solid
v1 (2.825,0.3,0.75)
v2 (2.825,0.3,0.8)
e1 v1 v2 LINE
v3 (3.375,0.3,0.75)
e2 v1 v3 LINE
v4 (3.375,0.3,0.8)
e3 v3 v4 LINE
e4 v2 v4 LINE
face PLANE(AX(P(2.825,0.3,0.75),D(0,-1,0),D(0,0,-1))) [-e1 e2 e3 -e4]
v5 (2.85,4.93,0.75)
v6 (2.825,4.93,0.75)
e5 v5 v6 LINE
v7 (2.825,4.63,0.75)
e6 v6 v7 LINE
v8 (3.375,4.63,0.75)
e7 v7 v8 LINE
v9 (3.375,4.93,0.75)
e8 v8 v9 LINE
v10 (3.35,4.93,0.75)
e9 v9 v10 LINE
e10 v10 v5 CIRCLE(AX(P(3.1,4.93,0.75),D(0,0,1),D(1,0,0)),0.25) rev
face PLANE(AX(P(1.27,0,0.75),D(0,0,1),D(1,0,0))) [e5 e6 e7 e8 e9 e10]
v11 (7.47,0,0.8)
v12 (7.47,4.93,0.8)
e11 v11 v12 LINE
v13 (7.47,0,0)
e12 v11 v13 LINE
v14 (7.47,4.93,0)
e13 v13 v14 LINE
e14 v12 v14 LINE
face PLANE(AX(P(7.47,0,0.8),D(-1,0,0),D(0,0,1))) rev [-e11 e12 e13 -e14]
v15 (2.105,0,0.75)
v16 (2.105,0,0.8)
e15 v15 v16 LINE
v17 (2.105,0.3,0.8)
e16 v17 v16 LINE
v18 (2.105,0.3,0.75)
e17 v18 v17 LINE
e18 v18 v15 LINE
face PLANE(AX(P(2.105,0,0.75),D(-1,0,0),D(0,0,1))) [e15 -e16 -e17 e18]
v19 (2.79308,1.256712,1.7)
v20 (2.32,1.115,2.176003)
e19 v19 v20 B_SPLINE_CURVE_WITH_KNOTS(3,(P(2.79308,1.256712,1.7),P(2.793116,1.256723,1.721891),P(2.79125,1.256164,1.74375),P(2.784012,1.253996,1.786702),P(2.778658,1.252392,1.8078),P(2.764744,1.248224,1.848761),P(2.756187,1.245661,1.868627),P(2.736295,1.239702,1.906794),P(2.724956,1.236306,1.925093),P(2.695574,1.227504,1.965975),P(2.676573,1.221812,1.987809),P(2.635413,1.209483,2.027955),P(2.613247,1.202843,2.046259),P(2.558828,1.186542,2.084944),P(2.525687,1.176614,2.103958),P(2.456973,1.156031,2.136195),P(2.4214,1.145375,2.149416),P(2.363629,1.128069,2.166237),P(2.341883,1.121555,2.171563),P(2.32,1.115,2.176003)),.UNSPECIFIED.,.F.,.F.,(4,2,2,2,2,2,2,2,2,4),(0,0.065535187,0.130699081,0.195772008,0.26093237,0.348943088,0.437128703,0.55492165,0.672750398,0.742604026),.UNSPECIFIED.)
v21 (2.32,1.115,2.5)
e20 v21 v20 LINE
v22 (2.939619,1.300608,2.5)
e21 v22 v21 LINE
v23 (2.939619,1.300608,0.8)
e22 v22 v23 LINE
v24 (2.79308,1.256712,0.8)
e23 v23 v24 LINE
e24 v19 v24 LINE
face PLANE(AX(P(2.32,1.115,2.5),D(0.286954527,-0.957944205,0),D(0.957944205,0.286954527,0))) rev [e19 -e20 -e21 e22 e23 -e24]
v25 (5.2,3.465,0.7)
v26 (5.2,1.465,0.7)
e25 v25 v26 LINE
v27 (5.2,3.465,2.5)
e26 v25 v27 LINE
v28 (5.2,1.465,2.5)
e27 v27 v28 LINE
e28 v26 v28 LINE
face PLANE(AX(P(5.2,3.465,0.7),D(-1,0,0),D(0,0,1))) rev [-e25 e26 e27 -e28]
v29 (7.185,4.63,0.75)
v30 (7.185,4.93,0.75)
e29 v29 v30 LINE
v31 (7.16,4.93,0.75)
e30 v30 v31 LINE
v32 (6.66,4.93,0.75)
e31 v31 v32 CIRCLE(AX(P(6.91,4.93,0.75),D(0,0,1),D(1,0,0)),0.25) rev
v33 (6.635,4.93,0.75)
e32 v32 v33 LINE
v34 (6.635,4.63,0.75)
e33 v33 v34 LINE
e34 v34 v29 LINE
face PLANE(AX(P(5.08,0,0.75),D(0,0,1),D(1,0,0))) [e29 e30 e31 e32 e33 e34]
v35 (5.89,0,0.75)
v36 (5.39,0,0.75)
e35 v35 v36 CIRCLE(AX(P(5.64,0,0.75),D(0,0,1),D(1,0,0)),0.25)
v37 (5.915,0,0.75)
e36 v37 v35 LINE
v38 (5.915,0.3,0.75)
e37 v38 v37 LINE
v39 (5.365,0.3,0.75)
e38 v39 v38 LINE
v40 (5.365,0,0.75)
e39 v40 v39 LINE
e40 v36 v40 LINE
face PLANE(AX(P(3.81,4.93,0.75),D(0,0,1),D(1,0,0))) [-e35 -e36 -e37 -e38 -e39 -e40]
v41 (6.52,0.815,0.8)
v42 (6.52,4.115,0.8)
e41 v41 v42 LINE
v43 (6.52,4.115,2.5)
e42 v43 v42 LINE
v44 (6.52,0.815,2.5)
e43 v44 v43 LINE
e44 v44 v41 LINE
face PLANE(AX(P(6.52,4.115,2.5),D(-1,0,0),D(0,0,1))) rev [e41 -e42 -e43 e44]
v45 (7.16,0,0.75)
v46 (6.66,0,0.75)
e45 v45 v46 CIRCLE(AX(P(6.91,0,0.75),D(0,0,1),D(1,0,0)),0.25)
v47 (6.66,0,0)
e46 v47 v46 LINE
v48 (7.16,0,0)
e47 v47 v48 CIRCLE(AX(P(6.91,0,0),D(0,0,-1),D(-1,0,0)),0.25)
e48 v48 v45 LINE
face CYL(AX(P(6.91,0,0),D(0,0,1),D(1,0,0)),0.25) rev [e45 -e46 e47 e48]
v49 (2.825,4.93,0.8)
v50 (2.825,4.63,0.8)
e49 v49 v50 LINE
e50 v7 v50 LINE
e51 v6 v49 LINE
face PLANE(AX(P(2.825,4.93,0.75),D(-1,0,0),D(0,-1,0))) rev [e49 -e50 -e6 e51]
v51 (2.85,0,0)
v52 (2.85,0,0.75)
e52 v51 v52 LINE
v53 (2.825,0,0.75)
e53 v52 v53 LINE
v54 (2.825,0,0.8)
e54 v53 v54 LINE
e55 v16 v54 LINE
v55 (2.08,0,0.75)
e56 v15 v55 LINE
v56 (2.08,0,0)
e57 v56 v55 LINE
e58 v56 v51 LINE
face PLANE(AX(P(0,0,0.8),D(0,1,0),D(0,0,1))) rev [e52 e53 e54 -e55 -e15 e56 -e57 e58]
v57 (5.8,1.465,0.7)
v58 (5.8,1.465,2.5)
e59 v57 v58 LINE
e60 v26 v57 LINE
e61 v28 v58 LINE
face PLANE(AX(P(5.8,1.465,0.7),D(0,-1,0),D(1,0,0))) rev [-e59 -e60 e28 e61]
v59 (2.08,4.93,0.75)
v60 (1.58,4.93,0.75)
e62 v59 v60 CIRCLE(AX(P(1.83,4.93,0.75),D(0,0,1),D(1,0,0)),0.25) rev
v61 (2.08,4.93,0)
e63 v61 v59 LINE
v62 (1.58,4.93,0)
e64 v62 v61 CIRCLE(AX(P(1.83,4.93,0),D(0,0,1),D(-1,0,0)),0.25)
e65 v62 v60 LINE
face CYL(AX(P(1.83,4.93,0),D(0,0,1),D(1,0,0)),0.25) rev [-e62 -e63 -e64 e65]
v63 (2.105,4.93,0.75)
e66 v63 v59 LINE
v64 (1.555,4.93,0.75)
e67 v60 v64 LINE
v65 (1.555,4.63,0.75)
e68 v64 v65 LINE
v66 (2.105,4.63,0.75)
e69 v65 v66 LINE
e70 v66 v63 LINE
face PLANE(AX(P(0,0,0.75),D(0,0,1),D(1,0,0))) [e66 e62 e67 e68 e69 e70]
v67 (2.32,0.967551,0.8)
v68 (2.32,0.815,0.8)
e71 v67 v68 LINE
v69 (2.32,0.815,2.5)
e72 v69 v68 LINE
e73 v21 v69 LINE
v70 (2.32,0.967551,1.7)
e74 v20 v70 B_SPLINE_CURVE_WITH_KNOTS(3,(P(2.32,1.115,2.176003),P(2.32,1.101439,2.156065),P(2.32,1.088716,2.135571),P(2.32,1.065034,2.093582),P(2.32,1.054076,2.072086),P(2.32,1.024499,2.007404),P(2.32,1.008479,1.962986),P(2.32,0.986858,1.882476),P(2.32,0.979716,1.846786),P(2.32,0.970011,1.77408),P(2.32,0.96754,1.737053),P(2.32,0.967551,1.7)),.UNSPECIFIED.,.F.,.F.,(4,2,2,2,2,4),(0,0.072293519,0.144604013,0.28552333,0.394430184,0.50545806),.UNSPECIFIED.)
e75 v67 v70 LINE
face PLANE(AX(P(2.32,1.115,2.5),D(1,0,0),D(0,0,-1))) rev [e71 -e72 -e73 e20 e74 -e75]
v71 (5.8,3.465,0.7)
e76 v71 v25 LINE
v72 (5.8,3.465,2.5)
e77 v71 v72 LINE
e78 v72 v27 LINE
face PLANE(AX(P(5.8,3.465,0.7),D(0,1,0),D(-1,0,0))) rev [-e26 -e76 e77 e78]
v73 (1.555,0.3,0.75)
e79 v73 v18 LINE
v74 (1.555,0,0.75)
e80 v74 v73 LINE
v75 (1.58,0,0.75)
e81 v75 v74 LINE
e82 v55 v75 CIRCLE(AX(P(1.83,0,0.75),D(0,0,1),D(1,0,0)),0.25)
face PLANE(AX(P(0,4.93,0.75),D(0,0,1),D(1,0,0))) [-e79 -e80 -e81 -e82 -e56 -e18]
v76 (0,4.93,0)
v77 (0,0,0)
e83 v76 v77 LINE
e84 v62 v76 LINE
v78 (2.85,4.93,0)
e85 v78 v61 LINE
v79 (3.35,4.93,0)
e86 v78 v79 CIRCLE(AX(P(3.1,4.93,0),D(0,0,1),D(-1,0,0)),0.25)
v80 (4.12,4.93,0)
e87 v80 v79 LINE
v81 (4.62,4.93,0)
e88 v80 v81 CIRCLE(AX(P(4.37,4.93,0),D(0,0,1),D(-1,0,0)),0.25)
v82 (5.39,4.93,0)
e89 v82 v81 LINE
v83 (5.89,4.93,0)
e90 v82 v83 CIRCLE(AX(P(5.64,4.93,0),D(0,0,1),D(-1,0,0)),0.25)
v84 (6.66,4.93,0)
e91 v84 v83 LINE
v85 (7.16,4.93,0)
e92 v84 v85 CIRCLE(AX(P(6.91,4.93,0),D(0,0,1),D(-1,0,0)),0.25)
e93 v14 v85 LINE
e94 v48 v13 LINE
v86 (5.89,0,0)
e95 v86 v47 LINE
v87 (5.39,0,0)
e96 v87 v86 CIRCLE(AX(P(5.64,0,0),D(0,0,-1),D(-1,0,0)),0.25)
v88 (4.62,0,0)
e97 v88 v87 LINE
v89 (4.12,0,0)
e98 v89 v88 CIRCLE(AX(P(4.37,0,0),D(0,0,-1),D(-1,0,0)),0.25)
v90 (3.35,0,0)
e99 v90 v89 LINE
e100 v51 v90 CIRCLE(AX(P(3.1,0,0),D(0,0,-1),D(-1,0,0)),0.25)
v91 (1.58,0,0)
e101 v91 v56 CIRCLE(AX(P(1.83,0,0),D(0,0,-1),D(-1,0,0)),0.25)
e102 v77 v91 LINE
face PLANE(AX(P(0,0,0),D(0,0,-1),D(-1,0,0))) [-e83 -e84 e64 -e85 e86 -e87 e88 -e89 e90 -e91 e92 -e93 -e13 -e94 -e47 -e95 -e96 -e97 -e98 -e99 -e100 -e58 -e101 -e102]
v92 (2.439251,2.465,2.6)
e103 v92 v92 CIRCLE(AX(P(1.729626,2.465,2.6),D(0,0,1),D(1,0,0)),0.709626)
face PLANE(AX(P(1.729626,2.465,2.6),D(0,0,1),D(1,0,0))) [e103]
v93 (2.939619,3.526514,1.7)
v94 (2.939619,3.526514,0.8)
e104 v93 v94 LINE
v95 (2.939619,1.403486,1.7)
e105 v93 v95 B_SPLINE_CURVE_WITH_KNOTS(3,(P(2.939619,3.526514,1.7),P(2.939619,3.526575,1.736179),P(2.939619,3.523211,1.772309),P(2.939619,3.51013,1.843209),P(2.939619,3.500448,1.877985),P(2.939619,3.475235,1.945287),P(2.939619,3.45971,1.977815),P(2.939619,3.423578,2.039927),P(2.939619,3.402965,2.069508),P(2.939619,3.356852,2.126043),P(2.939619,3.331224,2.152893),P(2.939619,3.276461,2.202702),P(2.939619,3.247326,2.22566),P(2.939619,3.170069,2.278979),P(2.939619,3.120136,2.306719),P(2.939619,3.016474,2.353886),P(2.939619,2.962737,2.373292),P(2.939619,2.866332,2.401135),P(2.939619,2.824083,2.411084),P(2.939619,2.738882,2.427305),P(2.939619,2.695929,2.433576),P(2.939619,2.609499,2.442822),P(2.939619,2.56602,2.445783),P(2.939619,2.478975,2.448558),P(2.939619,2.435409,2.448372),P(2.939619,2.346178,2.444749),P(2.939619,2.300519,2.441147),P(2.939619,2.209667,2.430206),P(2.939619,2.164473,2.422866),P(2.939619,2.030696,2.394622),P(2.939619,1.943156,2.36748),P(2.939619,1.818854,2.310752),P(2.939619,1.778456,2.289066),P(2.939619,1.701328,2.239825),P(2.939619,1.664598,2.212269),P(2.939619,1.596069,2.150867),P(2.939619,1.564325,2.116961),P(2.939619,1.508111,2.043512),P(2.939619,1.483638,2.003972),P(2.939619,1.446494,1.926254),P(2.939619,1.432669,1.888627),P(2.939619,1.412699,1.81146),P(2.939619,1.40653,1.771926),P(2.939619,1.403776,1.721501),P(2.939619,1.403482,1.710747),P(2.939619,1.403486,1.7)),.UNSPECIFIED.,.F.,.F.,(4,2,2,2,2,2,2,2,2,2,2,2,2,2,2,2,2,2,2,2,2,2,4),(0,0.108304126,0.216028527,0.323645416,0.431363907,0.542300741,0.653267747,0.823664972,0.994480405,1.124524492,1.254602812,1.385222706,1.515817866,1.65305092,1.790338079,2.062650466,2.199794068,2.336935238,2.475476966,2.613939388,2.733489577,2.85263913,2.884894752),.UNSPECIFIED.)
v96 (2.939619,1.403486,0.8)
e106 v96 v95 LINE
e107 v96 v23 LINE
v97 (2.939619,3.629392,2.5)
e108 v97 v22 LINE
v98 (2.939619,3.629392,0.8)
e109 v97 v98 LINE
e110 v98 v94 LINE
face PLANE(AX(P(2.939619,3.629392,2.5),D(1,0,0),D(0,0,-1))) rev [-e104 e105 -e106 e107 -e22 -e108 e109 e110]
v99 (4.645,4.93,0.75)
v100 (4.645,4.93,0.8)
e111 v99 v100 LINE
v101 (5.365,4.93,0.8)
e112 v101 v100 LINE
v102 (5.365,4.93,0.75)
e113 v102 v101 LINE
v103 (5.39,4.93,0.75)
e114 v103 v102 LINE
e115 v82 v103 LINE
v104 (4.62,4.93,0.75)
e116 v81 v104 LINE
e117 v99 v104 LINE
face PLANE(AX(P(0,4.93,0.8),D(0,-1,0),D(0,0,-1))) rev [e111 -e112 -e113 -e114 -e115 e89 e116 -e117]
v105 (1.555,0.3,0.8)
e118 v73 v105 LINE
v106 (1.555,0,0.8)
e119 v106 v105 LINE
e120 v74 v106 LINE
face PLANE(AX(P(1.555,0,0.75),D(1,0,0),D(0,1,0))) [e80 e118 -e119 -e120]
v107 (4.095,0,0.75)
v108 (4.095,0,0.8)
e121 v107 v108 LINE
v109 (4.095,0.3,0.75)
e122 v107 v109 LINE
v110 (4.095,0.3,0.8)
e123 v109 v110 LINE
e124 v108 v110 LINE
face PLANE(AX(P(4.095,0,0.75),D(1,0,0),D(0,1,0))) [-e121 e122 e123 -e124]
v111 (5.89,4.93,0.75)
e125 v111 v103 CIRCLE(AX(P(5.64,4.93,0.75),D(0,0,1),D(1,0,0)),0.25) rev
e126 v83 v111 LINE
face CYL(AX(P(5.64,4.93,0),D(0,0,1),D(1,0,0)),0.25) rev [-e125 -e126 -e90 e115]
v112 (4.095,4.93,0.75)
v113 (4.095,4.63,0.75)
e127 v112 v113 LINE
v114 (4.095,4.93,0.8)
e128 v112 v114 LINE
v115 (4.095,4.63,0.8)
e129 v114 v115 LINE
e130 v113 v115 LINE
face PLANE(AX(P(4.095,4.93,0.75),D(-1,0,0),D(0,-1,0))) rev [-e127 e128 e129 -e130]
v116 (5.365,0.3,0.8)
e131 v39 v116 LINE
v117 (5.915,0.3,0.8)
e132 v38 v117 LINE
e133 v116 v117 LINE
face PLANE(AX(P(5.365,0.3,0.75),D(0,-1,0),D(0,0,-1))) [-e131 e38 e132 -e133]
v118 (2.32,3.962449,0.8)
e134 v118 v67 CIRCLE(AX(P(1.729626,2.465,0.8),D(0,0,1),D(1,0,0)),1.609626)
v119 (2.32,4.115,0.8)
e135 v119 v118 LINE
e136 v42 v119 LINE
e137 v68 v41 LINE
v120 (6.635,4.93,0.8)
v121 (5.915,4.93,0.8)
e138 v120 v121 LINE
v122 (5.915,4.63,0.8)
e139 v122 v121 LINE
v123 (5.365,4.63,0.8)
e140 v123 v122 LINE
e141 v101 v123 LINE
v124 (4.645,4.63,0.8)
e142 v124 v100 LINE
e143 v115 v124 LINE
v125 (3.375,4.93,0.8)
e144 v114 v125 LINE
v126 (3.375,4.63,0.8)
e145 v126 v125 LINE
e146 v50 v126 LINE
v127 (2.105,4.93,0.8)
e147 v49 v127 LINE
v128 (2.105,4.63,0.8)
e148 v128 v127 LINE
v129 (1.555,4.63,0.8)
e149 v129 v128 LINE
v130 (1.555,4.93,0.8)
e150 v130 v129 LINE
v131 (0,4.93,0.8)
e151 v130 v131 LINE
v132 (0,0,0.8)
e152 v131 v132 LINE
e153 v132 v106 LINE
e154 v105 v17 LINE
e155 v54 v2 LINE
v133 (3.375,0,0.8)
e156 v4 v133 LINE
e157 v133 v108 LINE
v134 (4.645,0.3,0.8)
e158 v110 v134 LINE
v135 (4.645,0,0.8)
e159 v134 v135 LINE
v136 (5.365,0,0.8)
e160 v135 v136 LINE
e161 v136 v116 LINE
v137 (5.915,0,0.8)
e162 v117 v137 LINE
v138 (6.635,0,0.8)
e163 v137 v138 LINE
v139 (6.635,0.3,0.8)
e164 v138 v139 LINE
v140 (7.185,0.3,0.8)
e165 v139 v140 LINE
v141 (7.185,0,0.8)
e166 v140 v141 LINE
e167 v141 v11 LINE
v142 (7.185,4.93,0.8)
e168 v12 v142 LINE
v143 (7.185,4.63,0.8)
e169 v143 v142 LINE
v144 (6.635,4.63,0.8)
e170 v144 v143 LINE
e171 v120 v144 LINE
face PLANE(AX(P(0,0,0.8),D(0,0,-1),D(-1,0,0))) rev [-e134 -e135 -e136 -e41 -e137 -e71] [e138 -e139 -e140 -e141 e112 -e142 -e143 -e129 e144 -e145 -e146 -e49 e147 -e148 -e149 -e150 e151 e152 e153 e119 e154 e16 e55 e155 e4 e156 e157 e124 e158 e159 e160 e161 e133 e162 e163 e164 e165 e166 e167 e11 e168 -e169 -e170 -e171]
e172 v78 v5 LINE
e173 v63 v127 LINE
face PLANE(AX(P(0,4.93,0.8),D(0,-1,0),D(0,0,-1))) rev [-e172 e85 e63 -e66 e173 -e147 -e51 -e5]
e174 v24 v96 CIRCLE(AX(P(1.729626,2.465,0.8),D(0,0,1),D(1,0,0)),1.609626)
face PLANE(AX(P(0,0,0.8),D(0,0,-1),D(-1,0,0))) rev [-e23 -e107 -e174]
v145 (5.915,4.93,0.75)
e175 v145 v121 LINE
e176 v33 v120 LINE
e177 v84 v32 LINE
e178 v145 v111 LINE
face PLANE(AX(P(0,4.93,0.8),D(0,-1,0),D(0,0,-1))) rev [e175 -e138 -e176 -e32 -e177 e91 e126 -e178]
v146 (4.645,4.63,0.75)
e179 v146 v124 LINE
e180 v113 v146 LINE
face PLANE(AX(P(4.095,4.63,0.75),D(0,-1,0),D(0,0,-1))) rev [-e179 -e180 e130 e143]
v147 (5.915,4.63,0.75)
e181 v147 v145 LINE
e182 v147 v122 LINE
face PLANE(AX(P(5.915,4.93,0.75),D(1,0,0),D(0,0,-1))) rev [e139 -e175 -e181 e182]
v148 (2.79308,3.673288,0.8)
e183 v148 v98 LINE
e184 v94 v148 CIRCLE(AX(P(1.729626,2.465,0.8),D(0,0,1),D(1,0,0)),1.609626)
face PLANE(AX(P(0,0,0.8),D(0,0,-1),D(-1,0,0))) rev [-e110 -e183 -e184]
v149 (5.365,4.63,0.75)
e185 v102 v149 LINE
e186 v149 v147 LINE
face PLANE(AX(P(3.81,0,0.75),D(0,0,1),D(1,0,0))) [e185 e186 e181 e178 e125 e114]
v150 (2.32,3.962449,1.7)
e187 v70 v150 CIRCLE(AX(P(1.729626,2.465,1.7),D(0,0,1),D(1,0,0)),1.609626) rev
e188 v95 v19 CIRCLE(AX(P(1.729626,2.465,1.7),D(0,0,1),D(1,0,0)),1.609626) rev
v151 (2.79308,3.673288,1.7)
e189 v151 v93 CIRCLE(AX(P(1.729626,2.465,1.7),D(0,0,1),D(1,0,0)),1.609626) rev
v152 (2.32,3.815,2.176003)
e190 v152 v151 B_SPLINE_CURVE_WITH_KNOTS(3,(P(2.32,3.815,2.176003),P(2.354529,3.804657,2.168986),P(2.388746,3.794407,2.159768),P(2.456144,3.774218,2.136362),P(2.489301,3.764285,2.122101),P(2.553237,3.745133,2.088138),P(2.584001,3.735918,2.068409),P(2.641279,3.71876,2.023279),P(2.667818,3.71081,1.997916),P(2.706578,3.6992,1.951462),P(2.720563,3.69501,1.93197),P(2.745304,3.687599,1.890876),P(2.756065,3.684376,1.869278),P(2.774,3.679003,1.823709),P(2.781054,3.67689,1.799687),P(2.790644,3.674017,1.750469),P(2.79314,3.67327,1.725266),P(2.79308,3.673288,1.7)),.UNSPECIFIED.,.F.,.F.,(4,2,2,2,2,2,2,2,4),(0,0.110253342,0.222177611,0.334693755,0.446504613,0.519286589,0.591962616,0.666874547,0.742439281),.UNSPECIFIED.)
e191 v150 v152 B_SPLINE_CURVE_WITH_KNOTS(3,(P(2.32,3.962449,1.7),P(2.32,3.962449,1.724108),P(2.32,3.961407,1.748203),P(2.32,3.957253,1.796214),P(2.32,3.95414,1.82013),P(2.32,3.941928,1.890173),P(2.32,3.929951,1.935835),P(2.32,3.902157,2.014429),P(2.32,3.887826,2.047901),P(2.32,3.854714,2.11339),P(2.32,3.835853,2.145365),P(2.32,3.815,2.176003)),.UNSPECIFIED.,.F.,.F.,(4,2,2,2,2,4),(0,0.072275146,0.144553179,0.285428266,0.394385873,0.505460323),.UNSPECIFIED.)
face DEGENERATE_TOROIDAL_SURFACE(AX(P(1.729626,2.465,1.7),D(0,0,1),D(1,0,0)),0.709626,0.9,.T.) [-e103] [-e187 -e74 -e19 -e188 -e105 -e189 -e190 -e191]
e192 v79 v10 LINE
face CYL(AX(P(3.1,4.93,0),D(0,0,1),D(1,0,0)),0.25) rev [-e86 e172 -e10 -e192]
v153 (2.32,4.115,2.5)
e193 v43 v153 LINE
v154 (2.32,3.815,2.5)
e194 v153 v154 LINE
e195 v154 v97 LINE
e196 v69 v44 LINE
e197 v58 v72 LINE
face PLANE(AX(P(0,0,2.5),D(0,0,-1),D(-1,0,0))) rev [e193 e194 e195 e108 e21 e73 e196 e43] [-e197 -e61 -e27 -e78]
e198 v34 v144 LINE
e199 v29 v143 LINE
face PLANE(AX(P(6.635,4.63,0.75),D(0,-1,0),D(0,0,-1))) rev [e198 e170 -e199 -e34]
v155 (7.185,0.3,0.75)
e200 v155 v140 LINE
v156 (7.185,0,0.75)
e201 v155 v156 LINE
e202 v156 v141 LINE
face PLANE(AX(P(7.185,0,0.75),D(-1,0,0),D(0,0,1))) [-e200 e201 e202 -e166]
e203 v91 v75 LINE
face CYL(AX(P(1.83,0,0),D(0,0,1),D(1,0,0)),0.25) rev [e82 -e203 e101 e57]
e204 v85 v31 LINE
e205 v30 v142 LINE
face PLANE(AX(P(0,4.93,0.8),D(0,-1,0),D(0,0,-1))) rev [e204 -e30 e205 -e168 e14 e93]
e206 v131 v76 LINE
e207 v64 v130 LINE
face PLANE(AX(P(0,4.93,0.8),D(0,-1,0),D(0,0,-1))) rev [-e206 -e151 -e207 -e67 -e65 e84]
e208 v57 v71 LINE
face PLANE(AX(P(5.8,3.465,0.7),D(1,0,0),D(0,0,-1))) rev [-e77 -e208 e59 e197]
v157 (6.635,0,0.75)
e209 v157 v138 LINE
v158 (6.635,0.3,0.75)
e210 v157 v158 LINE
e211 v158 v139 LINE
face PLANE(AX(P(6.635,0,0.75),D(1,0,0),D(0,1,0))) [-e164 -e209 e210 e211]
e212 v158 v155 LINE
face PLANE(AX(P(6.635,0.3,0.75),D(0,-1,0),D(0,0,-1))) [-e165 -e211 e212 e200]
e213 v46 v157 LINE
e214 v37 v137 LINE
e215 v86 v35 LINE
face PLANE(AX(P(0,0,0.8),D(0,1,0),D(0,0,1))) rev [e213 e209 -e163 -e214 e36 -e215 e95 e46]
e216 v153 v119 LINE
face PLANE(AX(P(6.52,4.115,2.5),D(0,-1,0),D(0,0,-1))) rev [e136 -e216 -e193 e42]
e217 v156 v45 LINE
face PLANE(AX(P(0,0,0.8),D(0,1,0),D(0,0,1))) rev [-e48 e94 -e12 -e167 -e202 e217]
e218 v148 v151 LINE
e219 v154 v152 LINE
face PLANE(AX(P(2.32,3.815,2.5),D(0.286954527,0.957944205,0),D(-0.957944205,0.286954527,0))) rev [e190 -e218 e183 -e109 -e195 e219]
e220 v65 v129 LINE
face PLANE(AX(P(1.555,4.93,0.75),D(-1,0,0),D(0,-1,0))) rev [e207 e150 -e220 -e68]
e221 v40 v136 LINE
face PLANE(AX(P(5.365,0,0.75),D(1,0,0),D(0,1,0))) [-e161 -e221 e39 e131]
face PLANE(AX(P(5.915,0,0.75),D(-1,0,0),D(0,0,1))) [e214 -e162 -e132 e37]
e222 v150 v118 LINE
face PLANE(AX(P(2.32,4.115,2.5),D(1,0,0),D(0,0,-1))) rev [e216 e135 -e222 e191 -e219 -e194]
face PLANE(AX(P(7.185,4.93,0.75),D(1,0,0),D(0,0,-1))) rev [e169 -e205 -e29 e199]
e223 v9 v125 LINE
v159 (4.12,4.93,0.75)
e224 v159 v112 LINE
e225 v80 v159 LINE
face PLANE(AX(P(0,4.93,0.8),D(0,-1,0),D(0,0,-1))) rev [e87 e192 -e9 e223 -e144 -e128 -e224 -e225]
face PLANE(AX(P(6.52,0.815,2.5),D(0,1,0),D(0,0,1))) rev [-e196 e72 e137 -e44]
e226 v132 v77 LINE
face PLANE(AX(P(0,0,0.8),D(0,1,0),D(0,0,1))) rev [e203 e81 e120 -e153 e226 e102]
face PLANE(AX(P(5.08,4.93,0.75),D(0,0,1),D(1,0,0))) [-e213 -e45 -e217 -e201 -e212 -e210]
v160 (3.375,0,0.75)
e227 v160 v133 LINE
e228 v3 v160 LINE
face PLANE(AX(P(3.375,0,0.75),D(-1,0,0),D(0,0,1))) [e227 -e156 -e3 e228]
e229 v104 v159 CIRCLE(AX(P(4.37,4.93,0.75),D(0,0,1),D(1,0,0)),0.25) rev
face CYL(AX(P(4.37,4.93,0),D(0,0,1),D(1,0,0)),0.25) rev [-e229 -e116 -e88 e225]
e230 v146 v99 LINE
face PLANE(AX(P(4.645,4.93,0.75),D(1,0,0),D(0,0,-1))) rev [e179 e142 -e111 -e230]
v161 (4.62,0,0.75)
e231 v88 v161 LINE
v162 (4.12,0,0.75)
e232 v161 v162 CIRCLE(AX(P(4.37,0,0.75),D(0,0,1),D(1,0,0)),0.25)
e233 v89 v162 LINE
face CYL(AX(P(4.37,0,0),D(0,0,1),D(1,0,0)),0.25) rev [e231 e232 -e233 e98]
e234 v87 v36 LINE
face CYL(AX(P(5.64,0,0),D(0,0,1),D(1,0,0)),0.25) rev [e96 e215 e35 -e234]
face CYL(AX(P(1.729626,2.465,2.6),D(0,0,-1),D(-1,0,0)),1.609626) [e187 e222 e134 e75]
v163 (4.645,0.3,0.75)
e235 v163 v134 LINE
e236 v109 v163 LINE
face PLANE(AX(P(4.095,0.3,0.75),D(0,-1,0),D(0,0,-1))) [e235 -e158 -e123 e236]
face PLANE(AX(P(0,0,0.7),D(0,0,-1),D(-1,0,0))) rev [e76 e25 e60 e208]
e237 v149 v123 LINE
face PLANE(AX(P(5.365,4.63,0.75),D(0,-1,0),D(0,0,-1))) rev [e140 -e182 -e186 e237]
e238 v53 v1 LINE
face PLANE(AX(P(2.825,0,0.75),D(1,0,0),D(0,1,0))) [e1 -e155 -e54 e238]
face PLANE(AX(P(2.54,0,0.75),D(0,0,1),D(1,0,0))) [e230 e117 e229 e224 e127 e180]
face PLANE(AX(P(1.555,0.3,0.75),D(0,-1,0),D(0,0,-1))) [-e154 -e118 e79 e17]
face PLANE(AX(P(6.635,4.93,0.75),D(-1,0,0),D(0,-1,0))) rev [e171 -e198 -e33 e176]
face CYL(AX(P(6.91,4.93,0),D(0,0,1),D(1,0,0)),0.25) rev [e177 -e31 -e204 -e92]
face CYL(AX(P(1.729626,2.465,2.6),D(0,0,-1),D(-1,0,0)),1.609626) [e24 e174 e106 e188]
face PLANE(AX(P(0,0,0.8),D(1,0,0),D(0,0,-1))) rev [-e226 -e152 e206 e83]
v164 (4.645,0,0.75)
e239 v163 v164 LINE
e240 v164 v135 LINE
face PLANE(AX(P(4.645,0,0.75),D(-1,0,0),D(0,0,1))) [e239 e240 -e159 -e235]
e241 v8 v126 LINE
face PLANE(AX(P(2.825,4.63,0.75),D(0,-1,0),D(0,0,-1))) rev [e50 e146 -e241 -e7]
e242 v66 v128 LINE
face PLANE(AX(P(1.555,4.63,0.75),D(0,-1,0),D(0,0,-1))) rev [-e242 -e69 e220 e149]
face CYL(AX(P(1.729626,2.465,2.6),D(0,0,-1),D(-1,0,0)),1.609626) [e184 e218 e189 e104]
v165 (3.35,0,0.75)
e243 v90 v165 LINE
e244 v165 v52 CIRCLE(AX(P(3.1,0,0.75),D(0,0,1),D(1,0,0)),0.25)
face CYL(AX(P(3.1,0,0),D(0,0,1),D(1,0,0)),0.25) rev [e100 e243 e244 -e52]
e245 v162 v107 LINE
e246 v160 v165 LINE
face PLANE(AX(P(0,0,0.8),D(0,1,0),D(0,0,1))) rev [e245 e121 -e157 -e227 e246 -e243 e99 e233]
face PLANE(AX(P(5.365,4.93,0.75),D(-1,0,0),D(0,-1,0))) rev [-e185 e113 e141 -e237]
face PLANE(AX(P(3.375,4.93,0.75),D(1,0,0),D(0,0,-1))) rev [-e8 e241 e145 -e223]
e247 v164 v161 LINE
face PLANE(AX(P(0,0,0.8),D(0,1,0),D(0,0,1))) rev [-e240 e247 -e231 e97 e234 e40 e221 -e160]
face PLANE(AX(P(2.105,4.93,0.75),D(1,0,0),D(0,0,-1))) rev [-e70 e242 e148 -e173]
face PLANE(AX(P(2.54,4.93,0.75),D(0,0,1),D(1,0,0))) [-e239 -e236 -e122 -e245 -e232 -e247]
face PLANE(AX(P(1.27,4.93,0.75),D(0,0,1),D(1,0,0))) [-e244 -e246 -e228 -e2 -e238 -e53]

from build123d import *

# Parameters (mm, degrees)
SKETCH1_W               = 7.47
SKETCH1_H               = 4.93
BOSS_EXTRUDE1_DEPTH     = 0.8
BOSS_EXTRUDE2_DEPTH     = 1.7
SKETCH3_R               = 1.609625666
BOSS_EXTRUDE3_DEPTH     = 1.8
FILLET1_R               = 0.9
SKETCH4_W               = 0.6
SKETCH4_H               = 2
CUT_EXTRUDE1_DEPTH      = 1.8
CUT_EXTRUDE2_DEPTH      = 10.129392113
SKETCH6_W               = 0.55
SKETCH6_H               = 0.3
CUT_EXTRUDE3_DEPTH      = 0.05
LPATTERN1_COUNT         = 5
LPATTERN1_PITCH         = 1.27
MIRROR1_COPY_1_DEPTH    = 10.129392113
MIRROR1_COPY_2_DEPTH    = 10.129392113
MIRROR1_COPY_3_DEPTH    = 10.129392113
MIRROR1_COPY_4_DEPTH    = 10.129392113
MIRROR1_COPY_5_SKETCH_W = 0.55
MIRROR1_COPY_5_SKETCH_H = 0.3
MIRROR1_COPY_5_DEPTH    = 0.05
MIRROR1_COPY_6_SKETCH_W = 0.55
MIRROR1_COPY_6_SKETCH_H = 0.3
MIRROR1_COPY_6_DEPTH    = 0.05
MIRROR1_COPY_7_SKETCH_W = 0.55
MIRROR1_COPY_7_SKETCH_H = 0.3
MIRROR1_COPY_7_DEPTH    = 0.05
MIRROR1_COPY_8_SKETCH_W = 0.55
MIRROR1_COPY_8_SKETCH_H = 0.3
MIRROR1_COPY_8_DEPTH    = 0.05


with BuildPart() as part:
    # Sketch1 → Boss-Extrude1 (new body)
    with BuildSketch(Plane.XY):
        with Locations((3.735, 2.465)):
            Rectangle(SKETCH1_W, SKETCH1_H)
    extrude(amount=BOSS_EXTRUDE1_DEPTH)

    # Sketch2 → Boss-Extrude2 (add)
    with BuildSketch(Plane.XY.offset(0.8)):
        Polygon((2.939618782, 3.62939168), (2.939618782, 1.30060832), (2.32, 1.115), (2.32, 0.815), (6.52, 0.815), (6.52, 4.115), (2.32, 4.115), (2.32, 3.815), align=None)
    extrude(amount=BOSS_EXTRUDE2_DEPTH)

    # Sketch3 → Boss-Extrude3 (add)
    with BuildSketch(Plane.XY.offset(0.8)):
        with Locations(Location((1.729625666, 2.465, 0), (0, 0, 68.482991379))):
            Circle(SKETCH3_R)
    extrude(amount=BOSS_EXTRUDE3_DEPTH)

    # Fillet1
    # the kernel refuses this fillet: 0.9 mm, written as the material it takes off along each edge
    with BuildSketch(Plane(origin=(1.729625666, 2.465, 2.6), x_dir=(0.3667774110162909, 0.9303087287391142, 0), z_dir=(0.9303087287391142, -0.3667774110162909, 0))) as fillet1_piece_1_section:
        with BuildLine():
            CenterArc((1.609625666 - FILLET1_R, -FILLET1_R), FILLET1_R, 0, 90)
            Line((1.609625666 - FILLET1_R, 0), (1.609625666, 0))
            Line((1.609625666, 0), (1.609625666, -FILLET1_R))
        make_face()
    fillet1_piece_1 = revolve(axis=Axis((1.729625666, 2.465, 2.6), (0, 0, 1)), mode=Mode.PRIVATE)
    fillet1_piece_1 = split(fillet1_piece_1, bisect_by=Plane(origin=(2.32, 3.98462035, 2.239901454), z_dir=(-1, 0, 0)), keep=Keep.TOP, mode=Mode.PRIVATE)
    add(fillet1_piece_1, mode=Mode.SUBTRACT)
    with BuildSketch(Plane(origin=(1.729625666, 2.465, 2.6), x_dir=(0.3667774110162909, 0.9303087287391142, 0), z_dir=(0.9303087287391142, -0.3667774110162909, 0))) as fillet1_piece_2_section:
        with BuildLine():
            CenterArc((1.609625666 - FILLET1_R, -FILLET1_R), FILLET1_R, 0, 90)
            Line((1.609625666 - FILLET1_R, 0), (1.609625666, 0))
            Line((1.609625666, 0), (1.609625666, -FILLET1_R))
        make_face()
    fillet1_piece_2 = revolve(axis=Axis((1.729625666, 2.465, 2.6), (0, 0, 1)), mode=Mode.PRIVATE)
    fillet1_piece_2 = split(fillet1_piece_2, bisect_by=Plane(origin=(2.8939742, 1.286935374, 1.864268615), z_dir=(-0.28695452749278183, 0.9579442046128753, 0)), keep=Keep.TOP, mode=Mode.PRIVATE)
    fillet1_piece_2 = split(fillet1_piece_2, bisect_by=Plane(origin=(2.939618782, 1.348625417, 1.864268615), z_dir=(-1, 0, 0)), keep=Keep.TOP, mode=Mode.PRIVATE)
    fillet1_piece_2 = split(fillet1_piece_2, bisect_by=Plane(origin=(3.507726639, 3.459213583, 1.864268615), z_dir=(-0.28695452749278183, -0.9579442046128753, 0)), keep=Keep.TOP, mode=Mode.PRIVATE)
    add(fillet1_piece_2, mode=Mode.SUBTRACT)
    with BuildSketch(Plane(origin=(1.729625666, 2.465, 2.6), x_dir=(0.3667774110162909, 0.9303087287391142, 0), z_dir=(0.9303087287391142, -0.3667774110162909, 0))) as fillet1_piece_3_section:
        with BuildLine():
            CenterArc((1.609625666 - FILLET1_R, -FILLET1_R), FILLET1_R, 0, 90)
            Line((1.609625666 - FILLET1_R, 0), (1.609625666, 0))
            Line((1.609625666, 0), (1.609625666, -FILLET1_R))
        make_face()
    fillet1_piece_3 = revolve(axis=Axis((1.729625666, 2.465, 2.6), (0, 0, 1)), mode=Mode.PRIVATE)
    fillet1_piece_3 = split(fillet1_piece_3, bisect_by=Plane(origin=(2.494750344, 3.818777252, 2.5), z_dir=(0, 0, 1)), keep=Keep.TOP, mode=Mode.PRIVATE)
    add(fillet1_piece_3, mode=Mode.SUBTRACT)

    # Sketch4 → Cut-Extrude1 (cut)
    with BuildSketch(Plane.XY.offset(2.5)):
        with Locations((5.5, 2.465)):
            Rectangle(SKETCH4_W, SKETCH4_H)
    extrude(amount=-CUT_EXTRUDE1_DEPTH, mode=Mode.SUBTRACT)

    # Sketch5 → Cut-Extrude2 (cut, through all)
    with BuildSketch(Plane.XY.offset(0.8)):
        with BuildLine():
            Line((1.58, 4.93), (2.08, 4.93))
            ThreePointArc((2.08, 4.93), (1.83, 4.68), (1.58, 4.93))
        make_face()
    cut_extrude2 = extrude(amount=-CUT_EXTRUDE2_DEPTH, mode=Mode.SUBTRACT)

    # Sketch6 → Cut-Extrude3 (cut)
    with BuildSketch(Plane.XY.offset(0.8)):
        with Locations((1.83, 4.78)):
            Rectangle(SKETCH6_W, SKETCH6_H)
    cut_extrude3 = extrude(amount=-CUT_EXTRUDE3_DEPTH, mode=Mode.SUBTRACT)

    # LPattern1: Cut-Extrude2, Cut-Extrude3 ×5
    with Locations(*[(i * LPATTERN1_PITCH, 0, 0) for i in range(1, LPATTERN1_COUNT)]):
        add(cut_extrude2, mode=Mode.SUBTRACT)
        add(cut_extrude3, mode=Mode.SUBTRACT)

    # Mirror1: Cut-Extrude2, Cut-Extrude3 across plane
    add(cut_extrude2.mirror(Plane.ZX.offset(2.465)), mode=Mode.SUBTRACT)
    add(cut_extrude3.mirror(Plane.ZX.offset(2.465)), mode=Mode.SUBTRACT)

    # Mirror1 copy 1 sketch → Mirror1 copy 1 (cut, through all)
    with BuildSketch(Plane(origin=(1.27, 4.93, 0.8), x_dir=(1, 0, 0), z_dir=(0, 0, 1))):
        with BuildLine():
            Line((1.58, -4.93), (2.08, -4.93))
            ThreePointArc((2.08, -4.93), (1.83, -4.68), (1.58, -4.93))
        make_face()
    extrude(amount=-MIRROR1_COPY_1_DEPTH, mode=Mode.SUBTRACT)

    # Mirror1 copy 2 sketch → Mirror1 copy 2 (cut, through all)
    with BuildSketch(Plane(origin=(2.54, 4.93, 0.8), x_dir=(1, 0, 0), z_dir=(0, 0, 1))):
        with BuildLine():
            Line((1.58, -4.93), (2.08, -4.93))
            ThreePointArc((2.08, -4.93), (1.83, -4.68), (1.58, -4.93))
        make_face()
    extrude(amount=-MIRROR1_COPY_2_DEPTH, mode=Mode.SUBTRACT)

    # Mirror1 copy 3 sketch → Mirror1 copy 3 (cut, through all)
    with BuildSketch(Plane(origin=(3.81, 4.93, 0.8), x_dir=(1, 0, 0), z_dir=(0, 0, 1))):
        with BuildLine():
            Line((1.58, -4.93), (2.08, -4.93))
            ThreePointArc((2.08, -4.93), (1.83, -4.68), (1.58, -4.93))
        make_face()
    extrude(amount=-MIRROR1_COPY_3_DEPTH, mode=Mode.SUBTRACT)

    # Mirror1 copy 4 sketch → Mirror1 copy 4 (cut, through all)
    with BuildSketch(Plane(origin=(5.08, 4.93, 0.8), x_dir=(1, 0, 0), z_dir=(0, 0, 1))):
        with BuildLine():
            Line((1.58, -4.93), (2.08, -4.93))
            ThreePointArc((2.08, -4.93), (1.83, -4.68), (1.58, -4.93))
        make_face()
    extrude(amount=-MIRROR1_COPY_4_DEPTH, mode=Mode.SUBTRACT)

    # Mirror1 copy 5 sketch → Mirror1 copy 5 (cut)
    with BuildSketch(Plane(origin=(1.27, 4.93, 0.8), x_dir=(1, 0, 0), z_dir=(0, 0, 1))):
        with Locations((1.83, -4.78)):
            Rectangle(MIRROR1_COPY_5_SKETCH_W, MIRROR1_COPY_5_SKETCH_H)
    extrude(amount=-MIRROR1_COPY_5_DEPTH, mode=Mode.SUBTRACT)

    # Mirror1 copy 6 sketch → Mirror1 copy 6 (cut)
    with BuildSketch(Plane(origin=(2.54, 4.93, 0.8), x_dir=(1, 0, 0), z_dir=(0, 0, 1))):
        with Locations((1.83, -4.78)):
            Rectangle(MIRROR1_COPY_6_SKETCH_W, MIRROR1_COPY_6_SKETCH_H)
    extrude(amount=-MIRROR1_COPY_6_DEPTH, mode=Mode.SUBTRACT)

    # Mirror1 copy 7 sketch → Mirror1 copy 7 (cut)
    with BuildSketch(Plane(origin=(3.81, 4.93, 0.8), x_dir=(1, 0, 0), z_dir=(0, 0, 1))):
        with Locations((1.83, -4.78)):
            Rectangle(MIRROR1_COPY_7_SKETCH_W, MIRROR1_COPY_7_SKETCH_H)
    extrude(amount=-MIRROR1_COPY_7_DEPTH, mode=Mode.SUBTRACT)

    # Mirror1 copy 8 sketch → Mirror1 copy 8 (cut)
    with BuildSketch(Plane(origin=(5.08, 4.93, 0.8), x_dir=(1, 0, 0), z_dir=(0, 0, 1))):
        with Locations((1.83, -4.78)):
            Rectangle(MIRROR1_COPY_8_SKETCH_W, MIRROR1_COPY_8_SKETCH_H)
    extrude(amount=-MIRROR1_COPY_8_DEPTH, mode=Mode.SUBTRACT)


solid = part.part
